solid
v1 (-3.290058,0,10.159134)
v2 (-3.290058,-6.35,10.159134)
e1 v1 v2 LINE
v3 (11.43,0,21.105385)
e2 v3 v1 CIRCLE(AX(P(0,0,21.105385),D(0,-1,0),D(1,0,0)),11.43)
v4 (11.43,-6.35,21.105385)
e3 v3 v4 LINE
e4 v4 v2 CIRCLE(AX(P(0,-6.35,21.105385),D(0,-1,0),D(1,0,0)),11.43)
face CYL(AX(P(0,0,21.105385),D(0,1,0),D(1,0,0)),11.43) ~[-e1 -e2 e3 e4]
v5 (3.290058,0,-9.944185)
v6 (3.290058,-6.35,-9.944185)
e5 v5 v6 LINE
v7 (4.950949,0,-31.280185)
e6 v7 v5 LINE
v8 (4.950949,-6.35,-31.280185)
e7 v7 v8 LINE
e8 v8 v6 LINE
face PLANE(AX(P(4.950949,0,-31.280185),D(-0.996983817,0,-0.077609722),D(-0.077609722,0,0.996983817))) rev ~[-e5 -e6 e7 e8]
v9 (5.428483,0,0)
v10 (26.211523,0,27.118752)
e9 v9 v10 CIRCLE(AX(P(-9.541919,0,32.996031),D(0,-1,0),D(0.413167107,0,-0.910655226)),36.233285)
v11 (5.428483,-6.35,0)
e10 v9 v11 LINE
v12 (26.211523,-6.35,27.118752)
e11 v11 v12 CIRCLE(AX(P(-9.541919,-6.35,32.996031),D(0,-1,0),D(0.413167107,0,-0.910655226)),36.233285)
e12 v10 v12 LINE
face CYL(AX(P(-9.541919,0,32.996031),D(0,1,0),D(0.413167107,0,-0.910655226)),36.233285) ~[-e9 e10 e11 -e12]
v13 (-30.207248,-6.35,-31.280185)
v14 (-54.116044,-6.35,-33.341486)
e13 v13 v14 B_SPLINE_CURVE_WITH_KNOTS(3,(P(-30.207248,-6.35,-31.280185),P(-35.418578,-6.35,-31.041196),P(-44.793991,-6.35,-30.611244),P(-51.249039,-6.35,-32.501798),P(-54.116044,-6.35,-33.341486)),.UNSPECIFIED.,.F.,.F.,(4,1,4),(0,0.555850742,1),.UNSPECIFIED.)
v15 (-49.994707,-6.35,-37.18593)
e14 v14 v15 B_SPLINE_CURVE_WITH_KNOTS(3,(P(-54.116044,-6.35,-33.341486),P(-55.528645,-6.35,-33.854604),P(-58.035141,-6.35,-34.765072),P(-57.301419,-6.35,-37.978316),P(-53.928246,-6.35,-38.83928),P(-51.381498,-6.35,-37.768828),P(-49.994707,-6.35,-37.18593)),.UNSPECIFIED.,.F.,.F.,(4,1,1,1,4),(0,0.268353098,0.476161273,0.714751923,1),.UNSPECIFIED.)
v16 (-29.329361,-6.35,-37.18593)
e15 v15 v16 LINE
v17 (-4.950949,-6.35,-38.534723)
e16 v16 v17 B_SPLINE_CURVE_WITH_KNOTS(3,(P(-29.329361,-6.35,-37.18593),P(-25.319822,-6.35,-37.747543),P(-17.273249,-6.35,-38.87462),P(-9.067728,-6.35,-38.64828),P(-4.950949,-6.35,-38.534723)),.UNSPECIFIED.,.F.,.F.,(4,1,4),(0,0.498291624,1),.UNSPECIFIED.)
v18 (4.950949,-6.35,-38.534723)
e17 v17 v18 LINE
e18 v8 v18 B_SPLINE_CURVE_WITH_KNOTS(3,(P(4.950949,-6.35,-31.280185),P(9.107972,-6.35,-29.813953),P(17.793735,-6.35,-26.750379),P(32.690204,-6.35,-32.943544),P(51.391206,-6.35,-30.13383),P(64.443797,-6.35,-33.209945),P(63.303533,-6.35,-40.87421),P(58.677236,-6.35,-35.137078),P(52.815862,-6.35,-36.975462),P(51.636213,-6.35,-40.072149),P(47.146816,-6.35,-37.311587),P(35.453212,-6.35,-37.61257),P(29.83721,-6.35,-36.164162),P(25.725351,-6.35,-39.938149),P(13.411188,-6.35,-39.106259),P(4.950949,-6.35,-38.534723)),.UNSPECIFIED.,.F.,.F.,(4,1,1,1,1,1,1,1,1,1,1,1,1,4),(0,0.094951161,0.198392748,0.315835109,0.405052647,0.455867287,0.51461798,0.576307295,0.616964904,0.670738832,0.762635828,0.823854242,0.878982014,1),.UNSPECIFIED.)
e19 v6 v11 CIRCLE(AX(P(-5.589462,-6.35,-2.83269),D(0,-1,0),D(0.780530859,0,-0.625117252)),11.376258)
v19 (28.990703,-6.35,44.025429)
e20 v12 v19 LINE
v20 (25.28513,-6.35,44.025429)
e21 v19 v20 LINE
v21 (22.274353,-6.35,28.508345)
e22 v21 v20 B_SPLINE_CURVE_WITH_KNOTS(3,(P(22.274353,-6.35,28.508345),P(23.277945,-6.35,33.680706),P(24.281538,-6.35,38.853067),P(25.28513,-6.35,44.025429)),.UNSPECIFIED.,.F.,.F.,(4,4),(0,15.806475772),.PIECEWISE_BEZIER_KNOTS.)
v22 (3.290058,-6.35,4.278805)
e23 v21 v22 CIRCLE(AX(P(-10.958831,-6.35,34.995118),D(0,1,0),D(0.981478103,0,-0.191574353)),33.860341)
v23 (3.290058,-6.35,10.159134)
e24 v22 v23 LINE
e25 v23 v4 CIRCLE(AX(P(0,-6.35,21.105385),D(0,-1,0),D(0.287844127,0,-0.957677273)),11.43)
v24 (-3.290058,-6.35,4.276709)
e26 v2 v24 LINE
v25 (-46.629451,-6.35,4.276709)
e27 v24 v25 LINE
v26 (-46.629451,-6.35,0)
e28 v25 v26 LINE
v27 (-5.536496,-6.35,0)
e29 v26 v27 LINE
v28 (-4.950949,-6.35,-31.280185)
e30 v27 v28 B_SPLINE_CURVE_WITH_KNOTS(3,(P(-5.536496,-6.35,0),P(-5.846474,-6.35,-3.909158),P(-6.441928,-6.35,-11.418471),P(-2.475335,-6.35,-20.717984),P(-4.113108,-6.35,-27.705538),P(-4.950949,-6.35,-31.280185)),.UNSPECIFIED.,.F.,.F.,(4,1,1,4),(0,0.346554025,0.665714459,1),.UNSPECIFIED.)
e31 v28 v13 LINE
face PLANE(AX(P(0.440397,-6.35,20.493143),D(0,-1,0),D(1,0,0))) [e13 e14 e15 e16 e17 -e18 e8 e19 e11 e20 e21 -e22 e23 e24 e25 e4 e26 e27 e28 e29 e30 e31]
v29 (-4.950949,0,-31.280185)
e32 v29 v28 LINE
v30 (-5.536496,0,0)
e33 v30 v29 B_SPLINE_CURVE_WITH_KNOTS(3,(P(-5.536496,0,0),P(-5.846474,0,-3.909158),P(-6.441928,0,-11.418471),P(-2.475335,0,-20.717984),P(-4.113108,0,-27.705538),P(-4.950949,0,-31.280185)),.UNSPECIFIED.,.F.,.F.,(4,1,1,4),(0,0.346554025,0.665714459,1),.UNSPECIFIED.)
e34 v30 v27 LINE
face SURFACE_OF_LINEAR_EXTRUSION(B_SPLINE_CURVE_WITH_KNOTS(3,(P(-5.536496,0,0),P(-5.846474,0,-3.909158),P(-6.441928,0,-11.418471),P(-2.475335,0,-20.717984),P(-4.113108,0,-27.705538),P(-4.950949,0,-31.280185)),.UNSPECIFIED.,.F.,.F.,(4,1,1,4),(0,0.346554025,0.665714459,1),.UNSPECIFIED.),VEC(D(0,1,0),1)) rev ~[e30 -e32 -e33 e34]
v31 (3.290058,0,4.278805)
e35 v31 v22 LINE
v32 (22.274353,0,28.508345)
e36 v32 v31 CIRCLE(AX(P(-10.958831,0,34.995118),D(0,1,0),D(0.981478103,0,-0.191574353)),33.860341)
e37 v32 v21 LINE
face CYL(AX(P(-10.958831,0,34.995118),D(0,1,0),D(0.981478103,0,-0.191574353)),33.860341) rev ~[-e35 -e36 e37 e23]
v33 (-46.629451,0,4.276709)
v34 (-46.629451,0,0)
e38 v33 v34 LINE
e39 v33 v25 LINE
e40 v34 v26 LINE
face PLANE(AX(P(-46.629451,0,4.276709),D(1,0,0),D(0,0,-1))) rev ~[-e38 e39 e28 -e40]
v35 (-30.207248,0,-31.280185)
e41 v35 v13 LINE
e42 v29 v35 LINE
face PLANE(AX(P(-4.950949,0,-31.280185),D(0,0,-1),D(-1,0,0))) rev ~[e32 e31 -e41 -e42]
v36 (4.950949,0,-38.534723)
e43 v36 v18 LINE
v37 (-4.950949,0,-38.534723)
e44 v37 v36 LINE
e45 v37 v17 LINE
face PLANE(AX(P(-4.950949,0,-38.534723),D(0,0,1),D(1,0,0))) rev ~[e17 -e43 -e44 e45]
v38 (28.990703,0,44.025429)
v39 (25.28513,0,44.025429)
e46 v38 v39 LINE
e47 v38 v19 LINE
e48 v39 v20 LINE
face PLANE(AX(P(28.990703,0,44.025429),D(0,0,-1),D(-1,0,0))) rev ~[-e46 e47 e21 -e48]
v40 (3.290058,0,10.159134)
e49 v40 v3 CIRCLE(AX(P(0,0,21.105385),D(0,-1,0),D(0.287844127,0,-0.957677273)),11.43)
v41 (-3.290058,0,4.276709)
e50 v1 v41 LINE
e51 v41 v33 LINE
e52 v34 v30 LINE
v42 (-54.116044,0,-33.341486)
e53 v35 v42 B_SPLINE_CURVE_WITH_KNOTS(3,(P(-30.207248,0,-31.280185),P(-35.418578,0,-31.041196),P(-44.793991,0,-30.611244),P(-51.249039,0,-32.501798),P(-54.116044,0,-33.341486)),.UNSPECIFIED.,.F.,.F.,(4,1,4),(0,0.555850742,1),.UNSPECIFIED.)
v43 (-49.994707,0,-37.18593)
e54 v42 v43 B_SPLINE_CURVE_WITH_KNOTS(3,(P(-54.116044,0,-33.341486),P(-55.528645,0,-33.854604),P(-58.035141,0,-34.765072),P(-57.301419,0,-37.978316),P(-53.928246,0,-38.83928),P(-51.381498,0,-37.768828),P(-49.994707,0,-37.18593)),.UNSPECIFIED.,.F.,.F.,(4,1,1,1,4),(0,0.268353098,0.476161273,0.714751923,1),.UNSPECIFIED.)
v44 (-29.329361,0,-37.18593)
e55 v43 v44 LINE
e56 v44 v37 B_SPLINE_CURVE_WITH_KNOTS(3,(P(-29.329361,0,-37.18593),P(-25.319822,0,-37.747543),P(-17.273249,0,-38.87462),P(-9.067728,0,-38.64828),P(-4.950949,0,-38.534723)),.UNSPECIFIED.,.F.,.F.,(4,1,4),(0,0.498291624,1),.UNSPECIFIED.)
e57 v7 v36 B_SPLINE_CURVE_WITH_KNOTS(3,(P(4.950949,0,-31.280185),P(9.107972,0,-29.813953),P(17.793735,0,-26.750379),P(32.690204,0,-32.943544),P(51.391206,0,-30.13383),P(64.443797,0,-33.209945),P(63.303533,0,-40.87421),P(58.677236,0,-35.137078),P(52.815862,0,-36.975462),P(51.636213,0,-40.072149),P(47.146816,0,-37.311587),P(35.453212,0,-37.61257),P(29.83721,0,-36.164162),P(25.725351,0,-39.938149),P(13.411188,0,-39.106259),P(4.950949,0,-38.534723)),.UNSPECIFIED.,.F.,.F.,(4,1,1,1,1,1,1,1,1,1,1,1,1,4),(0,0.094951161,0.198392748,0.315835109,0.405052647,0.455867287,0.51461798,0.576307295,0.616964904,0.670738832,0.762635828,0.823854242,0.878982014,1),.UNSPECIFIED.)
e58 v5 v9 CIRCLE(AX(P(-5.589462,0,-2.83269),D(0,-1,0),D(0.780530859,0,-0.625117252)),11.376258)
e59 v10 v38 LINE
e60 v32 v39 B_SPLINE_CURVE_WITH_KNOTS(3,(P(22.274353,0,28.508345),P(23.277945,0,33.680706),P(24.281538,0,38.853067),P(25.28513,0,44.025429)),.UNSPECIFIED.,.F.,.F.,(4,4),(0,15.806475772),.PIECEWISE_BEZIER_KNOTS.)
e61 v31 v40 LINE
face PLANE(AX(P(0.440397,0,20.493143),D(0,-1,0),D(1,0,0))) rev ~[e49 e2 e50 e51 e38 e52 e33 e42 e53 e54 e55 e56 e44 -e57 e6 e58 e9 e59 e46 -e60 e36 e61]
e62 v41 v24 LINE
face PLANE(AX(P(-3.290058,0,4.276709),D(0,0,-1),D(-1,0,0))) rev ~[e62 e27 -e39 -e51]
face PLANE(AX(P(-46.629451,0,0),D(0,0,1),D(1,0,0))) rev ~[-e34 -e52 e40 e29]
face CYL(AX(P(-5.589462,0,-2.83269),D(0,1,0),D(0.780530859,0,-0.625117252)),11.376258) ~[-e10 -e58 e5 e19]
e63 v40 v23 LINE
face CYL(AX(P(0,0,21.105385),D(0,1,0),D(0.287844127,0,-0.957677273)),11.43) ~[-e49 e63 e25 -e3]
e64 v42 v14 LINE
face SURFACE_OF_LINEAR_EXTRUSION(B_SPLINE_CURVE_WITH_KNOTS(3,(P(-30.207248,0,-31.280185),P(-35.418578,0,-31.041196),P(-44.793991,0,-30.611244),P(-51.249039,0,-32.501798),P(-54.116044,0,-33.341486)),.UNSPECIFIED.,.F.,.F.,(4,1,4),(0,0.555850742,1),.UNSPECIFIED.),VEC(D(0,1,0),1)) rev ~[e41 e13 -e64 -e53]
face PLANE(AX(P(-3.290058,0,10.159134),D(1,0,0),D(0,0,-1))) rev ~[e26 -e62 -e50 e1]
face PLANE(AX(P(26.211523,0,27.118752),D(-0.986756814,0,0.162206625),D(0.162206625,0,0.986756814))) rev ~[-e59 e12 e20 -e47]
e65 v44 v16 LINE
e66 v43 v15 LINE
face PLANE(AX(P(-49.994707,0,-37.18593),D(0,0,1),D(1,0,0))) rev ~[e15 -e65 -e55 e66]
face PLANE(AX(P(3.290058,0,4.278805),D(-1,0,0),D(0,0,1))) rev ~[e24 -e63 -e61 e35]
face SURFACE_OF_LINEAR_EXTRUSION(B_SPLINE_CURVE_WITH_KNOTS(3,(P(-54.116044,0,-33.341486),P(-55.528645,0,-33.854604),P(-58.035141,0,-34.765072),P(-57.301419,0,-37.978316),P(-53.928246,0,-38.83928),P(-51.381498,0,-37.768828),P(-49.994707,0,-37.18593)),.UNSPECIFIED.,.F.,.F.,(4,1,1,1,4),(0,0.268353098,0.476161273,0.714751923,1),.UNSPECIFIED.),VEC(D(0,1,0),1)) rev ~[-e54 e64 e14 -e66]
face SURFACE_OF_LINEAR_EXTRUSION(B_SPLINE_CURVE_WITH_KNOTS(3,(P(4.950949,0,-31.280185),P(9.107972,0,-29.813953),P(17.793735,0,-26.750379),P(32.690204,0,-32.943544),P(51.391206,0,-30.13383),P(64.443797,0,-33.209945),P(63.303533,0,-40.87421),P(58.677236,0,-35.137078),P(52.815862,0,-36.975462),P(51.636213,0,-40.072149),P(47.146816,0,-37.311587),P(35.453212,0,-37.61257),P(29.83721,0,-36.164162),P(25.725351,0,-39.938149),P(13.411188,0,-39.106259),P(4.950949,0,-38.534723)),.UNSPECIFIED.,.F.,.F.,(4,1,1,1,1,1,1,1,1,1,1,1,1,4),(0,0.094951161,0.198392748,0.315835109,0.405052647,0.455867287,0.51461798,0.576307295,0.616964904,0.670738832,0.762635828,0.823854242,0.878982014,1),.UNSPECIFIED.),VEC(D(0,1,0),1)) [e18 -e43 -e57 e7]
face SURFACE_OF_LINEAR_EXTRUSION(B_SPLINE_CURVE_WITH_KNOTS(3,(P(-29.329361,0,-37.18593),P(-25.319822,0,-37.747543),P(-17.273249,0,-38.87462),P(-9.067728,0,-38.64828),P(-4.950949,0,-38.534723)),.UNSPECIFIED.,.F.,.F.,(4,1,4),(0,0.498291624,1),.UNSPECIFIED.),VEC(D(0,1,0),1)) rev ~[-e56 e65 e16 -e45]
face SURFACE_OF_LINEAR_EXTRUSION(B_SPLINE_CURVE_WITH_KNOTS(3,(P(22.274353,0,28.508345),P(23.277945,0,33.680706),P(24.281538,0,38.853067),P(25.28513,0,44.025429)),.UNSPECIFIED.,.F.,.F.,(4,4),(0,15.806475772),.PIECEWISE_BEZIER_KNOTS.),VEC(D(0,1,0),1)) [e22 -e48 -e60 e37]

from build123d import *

# Parameters (mm, degrees)
F1_DEPTH = 6.35


# Not quite as in the source:
# - a feature names something its author has since deleted; it is built from what else it names


with BuildPart() as f1:
    # F0 (on Front) → F1 (new body)
    with BuildSketch(Plane.XZ):
        with BuildLine():
            ThreePointArc((3.2900583662, 10.1591339407), (9.1719754449, 14.2848451287), (11.43, 21.1053851687))
            ThreePointArc((11.43, 21.1053851687), (-6.82054004, 30.2773606136), (-3.2900583662, 10.1591339407))
            ThreePointArc((-3.2900583662, 10.1591339407), (0, 9.6753851687), (3.2900583662, 10.1591339407))
        make_face()
        with BuildLine():
            ThreePointArc((3.2900583662, 10.1591339407), (0, 9.6753851687), (-3.2900583662, 10.1591339407))
            Line((-3.2900583662, 10.1591339407), (-3.2900583662, 4.2767086129))
            Line((-3.2900583662, 4.2767086129), (-46.6294512153, 4.2767086129))
            Line((-46.6294512153, 4.2767086129), (-46.6294512153, 0))
            Line((-46.6294512153, 0), (-5.5364955777, 0))
            add(Edge.make_bspline(
                [(-5.5364955777, 0), (-5.846473931, -3.9091577352), (-6.441928195, -11.4184712635), (-2.4753350411, -20.717984445), (-4.1131079796, -27.7055383728), (-4.950948954, -31.2801846833)],
                knots=[0, 0, 0, 0, 0.3465540249, 0.6657144591, 1, 1, 1, 1], degree=3))
            Line((-4.950948954, -31.2801846833), (-30.2072484046, -31.2801846833))
            add(Edge.make_bspline(
                [(-30.2072484046, -31.2801846833), (-35.4185782709, -31.0411958162), (-44.7939905391, -30.6112443041), (-51.2490391451, -32.5017979902), (-54.1160441935, -33.341486007)],
                knots=[0, 0, 0, 0, 0.5558507421, 1, 1, 1, 1], degree=3))
            add(Edge.make_bspline(
                [(-54.1160441935, -33.341486007), (-55.5286452206, -33.854603905), (-58.0351409859, -34.7650717679), (-57.3014191928, -37.9783158116), (-53.9282463564, -38.8392803933), (-51.3814983639, -37.7688277416), (-49.9947071075, -37.1859297156)],
                knots=[0, 0, 0, 0, 0.2683530976, 0.4761612725, 0.7147519232, 1, 1, 1, 1], degree=3))
            Line((-49.9947071075, -37.1859297156), (-29.329361394, -37.1859297156))
            add(Edge.make_bspline(
                [(-29.329361394, -37.1859297156), (-25.3198216255, -37.7475429691), (-17.2732489539, -38.874620419), (-9.0677276948, -38.6482800707), (-4.950948954, -38.5347232223)],
                knots=[0, 0, 0, 0, 0.4982916245, 1, 1, 1, 1], degree=3))
            Line((-4.950948954, -38.5347232223), (4.950948954, -38.5347232223))
            add(Edge.make_bspline(
                [(4.950948954, -31.2801846833), (9.1079723115, -29.8139525042), (17.7937353891, -26.7503793103), (32.6902038965, -32.9435441408), (51.3912064132, -30.1338297579), (64.4437974876, -33.2099452487), (63.3035332188, -40.8742099619), (58.6772356204, -35.1370782722), (52.8158624781, -36.975462438), (51.6362128477, -40.0721494762), (47.146816139, -37.3115873926), (35.4532116414, -37.6125697148), (29.8372100476, -36.1641615463), (25.7253514724, -39.9381489762), (13.4111881556, -39.1062591579), (4.950948954, -38.5347232223)],
                knots=[0, 0, 0, 0, 0.0949511611, 0.1983927484, 0.3158351085, 0.4050526471, 0.4558672869, 0.5146179799, 0.5763072953, 0.6169649042, 0.670738832, 0.762635828, 0.8238542417, 0.8789820135, 1, 1, 1, 1], degree=3))
            Line((4.950948954, -31.2801846833), (3.2900583662, -9.9441846833))
            ThreePointArc((3.2900583662, -9.9441846833), (5.5325425162, -5.2243959207), (5.4284829638, 0))
            ThreePointArc((5.4284829638, 0), (4.5867025548, 2.2530665196), (3.2900583662, 4.2788051125))
            Line((3.2900583662, 4.2788051125), (3.2900583662, 10.1591339407))
        make_face()
        with BuildLine():
            ThreePointArc((22.2743526101, 28.5083446652), (15.6945827163, 14.1116732403), (3.2900583662, 4.2788051125))
            ThreePointArc((3.2900583662, 4.2788051125), (4.5867025548, 2.2530665196), (5.4284829638, 0))
            ThreePointArc((5.4284829638, 0), (19.2171447998, 10.9559029), (26.2115225196, 27.1187517792))
            Line((26.2115225196, 27.1187517792), (28.9907027036, 44.0254285932))
            Line((28.9907027036, 44.0254285932), (25.2851303667, 44.0254285932))
            add(Edge.make_bspline(
                [(22.2743526101, 28.5083446652), (23.2779451956, 33.6807059745), (24.2815377812, 38.8530672838), (25.2851303667, 44.0254285932)],
                knots=[0, 0, 0, 0, 15.8064757719, 15.8064757719, 15.8064757719, 15.8064757719], degree=3))
        make_face()
    extrude(amount=F1_DEPTH)


solid = f1.part
